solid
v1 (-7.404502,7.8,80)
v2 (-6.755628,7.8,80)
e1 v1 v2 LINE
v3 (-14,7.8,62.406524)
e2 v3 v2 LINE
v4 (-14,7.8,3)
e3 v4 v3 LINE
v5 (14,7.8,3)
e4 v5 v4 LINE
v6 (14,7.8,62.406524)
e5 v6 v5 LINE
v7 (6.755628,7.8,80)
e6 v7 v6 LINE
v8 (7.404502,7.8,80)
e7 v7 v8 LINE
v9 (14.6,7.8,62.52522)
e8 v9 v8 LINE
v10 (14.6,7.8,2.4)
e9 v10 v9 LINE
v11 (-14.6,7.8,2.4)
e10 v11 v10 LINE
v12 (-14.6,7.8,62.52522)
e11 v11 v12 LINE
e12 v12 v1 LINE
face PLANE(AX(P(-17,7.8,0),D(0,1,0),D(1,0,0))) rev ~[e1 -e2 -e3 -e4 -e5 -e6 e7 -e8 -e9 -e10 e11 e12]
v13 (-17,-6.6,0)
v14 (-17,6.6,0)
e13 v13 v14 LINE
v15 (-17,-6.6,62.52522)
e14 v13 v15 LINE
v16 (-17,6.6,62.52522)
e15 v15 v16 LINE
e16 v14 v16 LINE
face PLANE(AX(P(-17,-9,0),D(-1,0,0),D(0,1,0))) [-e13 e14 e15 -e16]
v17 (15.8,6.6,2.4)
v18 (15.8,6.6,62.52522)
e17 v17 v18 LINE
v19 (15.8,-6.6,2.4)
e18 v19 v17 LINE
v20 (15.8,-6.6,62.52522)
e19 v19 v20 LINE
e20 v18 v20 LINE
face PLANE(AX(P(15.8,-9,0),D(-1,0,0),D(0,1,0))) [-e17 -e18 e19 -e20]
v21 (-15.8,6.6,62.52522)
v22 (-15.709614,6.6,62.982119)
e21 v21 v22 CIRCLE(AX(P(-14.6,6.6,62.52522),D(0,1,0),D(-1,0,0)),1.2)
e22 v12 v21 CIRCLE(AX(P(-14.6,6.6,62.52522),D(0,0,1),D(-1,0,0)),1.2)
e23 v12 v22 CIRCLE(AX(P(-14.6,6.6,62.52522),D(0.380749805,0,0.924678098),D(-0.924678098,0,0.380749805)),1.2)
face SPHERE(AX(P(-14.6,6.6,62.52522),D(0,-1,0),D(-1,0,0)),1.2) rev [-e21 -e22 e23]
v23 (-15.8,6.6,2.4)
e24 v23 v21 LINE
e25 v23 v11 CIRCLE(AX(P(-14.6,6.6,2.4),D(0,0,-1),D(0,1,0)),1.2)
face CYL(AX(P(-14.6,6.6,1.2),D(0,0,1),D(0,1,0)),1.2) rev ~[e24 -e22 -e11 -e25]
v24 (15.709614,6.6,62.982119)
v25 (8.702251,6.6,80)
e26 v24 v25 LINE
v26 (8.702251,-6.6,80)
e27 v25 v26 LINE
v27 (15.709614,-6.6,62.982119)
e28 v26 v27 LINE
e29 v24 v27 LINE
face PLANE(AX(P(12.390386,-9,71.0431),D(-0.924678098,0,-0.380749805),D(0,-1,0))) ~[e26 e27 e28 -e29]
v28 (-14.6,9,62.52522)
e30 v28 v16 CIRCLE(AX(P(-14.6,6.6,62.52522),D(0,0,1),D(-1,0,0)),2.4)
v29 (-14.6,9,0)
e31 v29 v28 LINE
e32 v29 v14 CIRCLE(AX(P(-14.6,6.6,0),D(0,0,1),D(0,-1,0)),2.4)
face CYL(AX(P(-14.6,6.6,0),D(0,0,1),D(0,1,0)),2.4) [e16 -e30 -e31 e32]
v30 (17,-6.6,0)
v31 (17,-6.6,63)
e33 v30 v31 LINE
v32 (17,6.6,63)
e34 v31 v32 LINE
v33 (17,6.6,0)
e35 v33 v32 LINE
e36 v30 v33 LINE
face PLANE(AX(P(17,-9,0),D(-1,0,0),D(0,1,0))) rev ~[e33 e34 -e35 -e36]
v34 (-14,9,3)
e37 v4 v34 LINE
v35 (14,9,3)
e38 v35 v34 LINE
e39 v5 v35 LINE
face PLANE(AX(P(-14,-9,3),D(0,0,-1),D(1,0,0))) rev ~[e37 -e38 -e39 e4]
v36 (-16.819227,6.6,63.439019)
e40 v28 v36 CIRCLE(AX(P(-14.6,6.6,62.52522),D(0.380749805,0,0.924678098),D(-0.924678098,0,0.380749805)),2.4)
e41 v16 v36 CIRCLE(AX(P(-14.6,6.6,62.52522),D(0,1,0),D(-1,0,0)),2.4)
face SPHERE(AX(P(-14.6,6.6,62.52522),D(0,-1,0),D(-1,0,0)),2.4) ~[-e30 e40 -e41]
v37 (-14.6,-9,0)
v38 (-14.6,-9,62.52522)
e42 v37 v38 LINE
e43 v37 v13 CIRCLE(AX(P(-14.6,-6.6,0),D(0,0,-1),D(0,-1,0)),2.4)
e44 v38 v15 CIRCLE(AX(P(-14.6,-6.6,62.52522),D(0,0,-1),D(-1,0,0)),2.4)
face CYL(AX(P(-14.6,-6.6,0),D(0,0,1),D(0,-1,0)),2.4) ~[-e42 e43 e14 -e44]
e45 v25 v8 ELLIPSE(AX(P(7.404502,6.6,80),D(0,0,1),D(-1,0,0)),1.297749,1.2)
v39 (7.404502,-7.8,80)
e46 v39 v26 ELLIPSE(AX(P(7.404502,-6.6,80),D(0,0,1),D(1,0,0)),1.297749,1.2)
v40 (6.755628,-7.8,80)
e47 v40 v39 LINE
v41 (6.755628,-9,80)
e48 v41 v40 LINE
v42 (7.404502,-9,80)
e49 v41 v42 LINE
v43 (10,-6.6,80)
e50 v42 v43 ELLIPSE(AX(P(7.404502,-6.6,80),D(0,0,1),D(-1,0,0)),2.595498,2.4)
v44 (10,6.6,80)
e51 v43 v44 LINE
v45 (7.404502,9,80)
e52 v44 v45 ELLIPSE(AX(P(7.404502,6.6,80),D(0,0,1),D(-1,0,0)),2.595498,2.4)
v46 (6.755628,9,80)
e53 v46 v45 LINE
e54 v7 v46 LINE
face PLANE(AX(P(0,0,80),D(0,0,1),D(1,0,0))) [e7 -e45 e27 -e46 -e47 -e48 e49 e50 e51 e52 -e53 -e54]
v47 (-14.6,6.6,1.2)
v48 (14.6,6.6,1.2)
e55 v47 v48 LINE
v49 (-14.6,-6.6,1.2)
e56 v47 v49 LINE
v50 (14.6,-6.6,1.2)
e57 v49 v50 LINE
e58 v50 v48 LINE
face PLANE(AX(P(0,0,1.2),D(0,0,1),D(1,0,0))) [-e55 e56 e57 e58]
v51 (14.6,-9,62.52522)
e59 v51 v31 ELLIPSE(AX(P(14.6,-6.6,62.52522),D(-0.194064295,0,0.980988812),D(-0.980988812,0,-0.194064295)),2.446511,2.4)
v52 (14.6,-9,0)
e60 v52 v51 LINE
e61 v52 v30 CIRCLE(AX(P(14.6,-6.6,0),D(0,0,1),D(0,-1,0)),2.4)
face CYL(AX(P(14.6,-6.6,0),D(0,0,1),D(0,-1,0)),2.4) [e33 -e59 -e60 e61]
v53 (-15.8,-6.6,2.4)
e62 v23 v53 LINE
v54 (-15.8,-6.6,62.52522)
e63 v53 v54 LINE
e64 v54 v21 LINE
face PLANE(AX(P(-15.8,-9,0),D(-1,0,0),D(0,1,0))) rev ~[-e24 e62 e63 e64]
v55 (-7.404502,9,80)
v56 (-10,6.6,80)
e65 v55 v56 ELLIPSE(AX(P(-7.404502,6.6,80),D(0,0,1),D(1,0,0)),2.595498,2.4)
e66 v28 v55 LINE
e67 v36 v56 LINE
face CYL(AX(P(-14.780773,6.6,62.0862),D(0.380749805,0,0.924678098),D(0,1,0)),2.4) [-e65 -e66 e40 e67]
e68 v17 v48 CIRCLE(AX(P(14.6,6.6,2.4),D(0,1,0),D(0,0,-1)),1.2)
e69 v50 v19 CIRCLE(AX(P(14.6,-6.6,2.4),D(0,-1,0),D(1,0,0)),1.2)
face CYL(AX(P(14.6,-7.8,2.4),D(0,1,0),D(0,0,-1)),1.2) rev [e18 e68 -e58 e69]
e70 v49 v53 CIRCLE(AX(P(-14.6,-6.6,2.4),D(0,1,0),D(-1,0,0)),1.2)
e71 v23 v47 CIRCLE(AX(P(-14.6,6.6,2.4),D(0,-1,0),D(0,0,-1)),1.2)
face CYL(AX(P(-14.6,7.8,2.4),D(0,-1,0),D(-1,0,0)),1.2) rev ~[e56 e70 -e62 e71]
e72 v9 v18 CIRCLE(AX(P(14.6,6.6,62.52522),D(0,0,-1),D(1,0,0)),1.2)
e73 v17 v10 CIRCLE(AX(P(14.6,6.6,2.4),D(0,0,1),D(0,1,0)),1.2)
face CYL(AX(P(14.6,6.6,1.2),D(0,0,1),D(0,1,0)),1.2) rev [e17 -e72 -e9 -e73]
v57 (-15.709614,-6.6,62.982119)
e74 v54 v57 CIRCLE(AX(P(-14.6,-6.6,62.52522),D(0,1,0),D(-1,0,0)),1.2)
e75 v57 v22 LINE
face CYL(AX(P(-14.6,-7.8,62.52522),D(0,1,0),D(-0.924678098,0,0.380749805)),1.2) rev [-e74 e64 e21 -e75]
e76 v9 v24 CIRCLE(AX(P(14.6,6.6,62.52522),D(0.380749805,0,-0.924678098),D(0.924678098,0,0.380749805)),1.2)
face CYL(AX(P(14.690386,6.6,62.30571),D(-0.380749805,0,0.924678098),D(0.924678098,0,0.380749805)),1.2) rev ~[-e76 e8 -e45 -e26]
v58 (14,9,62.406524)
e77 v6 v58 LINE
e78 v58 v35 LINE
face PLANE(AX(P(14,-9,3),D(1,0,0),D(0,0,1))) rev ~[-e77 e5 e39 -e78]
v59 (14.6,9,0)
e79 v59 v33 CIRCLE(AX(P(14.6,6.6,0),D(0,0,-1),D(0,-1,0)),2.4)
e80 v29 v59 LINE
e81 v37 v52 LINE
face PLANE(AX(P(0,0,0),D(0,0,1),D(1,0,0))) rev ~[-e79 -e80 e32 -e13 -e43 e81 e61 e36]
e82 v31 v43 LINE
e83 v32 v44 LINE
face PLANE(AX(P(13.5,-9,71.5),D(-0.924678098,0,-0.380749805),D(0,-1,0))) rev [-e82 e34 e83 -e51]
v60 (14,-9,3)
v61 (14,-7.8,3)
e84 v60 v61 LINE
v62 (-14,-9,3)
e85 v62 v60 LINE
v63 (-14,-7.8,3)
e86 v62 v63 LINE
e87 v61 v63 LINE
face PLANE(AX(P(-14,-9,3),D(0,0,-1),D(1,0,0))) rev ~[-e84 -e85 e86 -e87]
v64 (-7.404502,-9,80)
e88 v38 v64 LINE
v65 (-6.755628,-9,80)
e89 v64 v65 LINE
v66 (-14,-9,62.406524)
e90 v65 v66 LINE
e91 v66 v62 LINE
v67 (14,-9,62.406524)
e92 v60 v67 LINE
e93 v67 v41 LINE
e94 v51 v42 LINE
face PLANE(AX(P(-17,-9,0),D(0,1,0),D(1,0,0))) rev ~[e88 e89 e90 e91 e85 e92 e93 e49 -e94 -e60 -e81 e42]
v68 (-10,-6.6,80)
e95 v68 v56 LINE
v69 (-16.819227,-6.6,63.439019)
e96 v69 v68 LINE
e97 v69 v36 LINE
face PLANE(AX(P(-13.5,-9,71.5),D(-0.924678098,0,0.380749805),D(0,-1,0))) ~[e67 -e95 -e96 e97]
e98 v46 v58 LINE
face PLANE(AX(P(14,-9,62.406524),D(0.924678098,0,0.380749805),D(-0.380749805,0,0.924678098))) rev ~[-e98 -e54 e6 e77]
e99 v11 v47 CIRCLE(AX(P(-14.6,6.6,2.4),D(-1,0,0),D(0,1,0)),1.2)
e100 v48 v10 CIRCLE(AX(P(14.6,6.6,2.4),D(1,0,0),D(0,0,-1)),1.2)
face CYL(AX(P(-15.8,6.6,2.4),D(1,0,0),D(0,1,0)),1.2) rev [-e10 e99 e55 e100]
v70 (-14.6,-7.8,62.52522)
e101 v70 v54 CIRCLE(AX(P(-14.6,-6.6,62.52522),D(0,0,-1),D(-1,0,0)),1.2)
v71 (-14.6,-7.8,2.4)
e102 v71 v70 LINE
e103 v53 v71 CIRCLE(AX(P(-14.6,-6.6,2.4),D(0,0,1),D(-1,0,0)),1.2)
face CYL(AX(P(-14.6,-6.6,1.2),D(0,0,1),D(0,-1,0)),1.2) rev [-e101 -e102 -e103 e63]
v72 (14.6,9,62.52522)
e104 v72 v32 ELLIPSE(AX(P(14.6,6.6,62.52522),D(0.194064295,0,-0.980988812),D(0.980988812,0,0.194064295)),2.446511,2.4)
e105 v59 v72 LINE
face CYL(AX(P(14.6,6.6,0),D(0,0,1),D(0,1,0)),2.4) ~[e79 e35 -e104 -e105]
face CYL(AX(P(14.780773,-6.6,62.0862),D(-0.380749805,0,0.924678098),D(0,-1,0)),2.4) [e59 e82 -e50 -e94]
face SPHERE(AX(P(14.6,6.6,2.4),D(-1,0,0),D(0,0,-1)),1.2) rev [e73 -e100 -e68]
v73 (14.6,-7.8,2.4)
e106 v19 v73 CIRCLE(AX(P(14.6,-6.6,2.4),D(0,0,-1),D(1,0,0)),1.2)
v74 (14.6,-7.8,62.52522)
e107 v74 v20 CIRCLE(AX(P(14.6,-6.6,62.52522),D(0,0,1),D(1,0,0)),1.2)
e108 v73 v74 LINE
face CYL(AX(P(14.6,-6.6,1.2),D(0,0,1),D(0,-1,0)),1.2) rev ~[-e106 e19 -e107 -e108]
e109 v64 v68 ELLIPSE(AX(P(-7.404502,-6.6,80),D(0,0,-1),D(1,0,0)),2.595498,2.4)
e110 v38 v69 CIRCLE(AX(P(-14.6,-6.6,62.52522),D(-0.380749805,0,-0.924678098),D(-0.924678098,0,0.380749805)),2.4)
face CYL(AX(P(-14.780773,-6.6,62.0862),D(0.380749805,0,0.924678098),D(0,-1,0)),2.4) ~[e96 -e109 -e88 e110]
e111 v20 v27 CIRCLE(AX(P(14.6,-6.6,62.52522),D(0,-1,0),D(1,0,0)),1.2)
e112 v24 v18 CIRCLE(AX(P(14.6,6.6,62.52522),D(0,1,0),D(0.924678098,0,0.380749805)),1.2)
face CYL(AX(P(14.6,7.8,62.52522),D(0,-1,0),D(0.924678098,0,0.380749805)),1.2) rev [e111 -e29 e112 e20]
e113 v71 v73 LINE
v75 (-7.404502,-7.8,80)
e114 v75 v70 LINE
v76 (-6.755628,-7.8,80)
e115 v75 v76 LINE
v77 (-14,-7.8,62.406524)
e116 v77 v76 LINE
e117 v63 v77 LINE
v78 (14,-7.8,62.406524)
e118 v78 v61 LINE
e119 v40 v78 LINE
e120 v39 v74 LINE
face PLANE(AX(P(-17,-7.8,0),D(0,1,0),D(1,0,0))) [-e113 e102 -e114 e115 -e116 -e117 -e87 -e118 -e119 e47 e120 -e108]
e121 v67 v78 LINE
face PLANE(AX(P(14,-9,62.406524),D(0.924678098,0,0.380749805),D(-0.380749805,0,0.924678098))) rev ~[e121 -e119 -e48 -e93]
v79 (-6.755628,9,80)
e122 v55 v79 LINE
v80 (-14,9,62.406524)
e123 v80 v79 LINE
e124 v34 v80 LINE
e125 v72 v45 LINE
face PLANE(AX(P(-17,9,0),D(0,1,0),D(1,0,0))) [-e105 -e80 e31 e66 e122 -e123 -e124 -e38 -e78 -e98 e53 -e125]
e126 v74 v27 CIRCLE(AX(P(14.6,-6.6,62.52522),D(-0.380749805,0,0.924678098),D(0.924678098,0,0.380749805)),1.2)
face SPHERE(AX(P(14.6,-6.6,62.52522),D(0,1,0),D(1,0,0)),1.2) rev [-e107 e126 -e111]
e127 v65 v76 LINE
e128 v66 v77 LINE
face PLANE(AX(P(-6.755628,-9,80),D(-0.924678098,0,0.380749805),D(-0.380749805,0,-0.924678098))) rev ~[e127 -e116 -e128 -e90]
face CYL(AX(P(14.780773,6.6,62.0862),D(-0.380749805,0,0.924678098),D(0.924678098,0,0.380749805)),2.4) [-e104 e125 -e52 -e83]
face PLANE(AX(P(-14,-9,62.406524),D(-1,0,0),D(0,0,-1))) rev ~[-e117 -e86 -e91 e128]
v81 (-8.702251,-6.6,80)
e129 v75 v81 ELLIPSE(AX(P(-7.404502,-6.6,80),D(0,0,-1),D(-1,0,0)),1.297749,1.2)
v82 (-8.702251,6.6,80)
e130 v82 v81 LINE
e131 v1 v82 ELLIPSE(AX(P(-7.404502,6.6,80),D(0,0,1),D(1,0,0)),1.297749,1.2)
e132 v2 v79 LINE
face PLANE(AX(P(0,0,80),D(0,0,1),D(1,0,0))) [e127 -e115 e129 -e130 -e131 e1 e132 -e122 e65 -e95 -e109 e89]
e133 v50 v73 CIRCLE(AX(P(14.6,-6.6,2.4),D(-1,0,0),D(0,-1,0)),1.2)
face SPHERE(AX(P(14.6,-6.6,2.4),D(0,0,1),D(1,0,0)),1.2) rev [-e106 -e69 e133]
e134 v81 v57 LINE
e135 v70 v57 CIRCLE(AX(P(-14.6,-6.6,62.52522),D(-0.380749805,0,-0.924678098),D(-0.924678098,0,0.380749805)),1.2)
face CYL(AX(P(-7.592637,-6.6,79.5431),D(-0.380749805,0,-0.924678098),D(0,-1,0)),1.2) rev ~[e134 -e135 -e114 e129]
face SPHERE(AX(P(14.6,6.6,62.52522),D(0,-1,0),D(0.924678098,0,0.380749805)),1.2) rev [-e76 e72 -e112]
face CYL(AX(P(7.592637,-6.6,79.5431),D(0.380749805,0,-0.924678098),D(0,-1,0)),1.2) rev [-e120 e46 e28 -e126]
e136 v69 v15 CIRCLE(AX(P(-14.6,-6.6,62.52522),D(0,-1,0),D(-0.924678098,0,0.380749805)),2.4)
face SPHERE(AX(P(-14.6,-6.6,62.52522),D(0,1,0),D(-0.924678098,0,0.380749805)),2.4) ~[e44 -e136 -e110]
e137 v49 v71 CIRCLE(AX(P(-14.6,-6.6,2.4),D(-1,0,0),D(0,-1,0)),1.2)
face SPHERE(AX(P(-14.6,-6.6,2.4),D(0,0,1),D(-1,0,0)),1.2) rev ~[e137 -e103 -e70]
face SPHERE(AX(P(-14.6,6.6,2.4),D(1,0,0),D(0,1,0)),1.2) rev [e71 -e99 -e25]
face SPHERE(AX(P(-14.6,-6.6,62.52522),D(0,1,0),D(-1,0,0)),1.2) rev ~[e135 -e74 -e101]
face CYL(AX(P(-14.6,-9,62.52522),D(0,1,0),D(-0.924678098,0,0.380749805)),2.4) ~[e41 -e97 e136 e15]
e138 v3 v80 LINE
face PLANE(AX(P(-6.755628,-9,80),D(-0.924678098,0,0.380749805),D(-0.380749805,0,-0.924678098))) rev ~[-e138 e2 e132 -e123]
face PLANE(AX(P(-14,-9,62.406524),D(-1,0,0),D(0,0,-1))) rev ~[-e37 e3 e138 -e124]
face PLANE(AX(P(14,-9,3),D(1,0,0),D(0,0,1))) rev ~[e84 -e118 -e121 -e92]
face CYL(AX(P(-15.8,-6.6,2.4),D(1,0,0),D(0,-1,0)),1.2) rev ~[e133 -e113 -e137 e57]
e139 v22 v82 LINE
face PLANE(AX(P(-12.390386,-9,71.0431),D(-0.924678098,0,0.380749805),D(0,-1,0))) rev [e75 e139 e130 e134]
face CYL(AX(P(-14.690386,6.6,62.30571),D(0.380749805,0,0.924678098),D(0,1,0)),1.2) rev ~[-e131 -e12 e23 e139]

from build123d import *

# Parameters (mm, degrees)
F0_W       = 34
F0_H       = 18
F1_DEPTH   = 80
F2_SIZE2   = 7
F2_SIZE    = 17
F2_2_SIZE2 = 7
F2_2_SIZE  = 17
F3_T       = -1.2
F5_DEPTH   = 18.001
F6_R       = 1.2
F7_R       = 2.4


with BuildPart() as f1:
    # F0 (on Top) → F1 (new body)
    with BuildSketch(Plane.XY):
        Rectangle(F0_W, F0_H)
    extrude(amount=F1_DEPTH)

    # F2
    f2_edges = [f1.edges().sort_by_distance(p)[0] for p in [
        (-17, 0, 80),
    ]]
    f2_side = f1.faces().sort_by_distance((-17, 0, 40))[0]
    chamfer(f2_edges, length=F2_SIZE, length2=F2_SIZE2, reference=f2_side)

    # F2#2
    f2_2_edges = [f1.edges().sort_by_distance(p)[0] for p in [
        (17, 0, 80),
    ]]
    f2_2_side = f1.faces().sort_by_distance((17, 0, 40))[0]
    chamfer(f2_2_edges, length=F2_2_SIZE, length2=F2_2_SIZE2, reference=f2_2_side)

    # F3
    f3_openings = [f1.faces().sort_by_distance(p)[0] for p in [
        (0, 0, 80),
    ]]
    offset(amount=F3_T, openings=f3_openings)

    # F4 (on face) → F5 (cut, through all)
    with BuildSketch(Plane.XZ.offset(9)):
        Polygon((-6.7556277098, 80), (-14, 62.4065244382), (-14, 3), (14, 3), (14, 62.4065244382), (6.7556277098, 80), align=None)
    extrude(amount=-F5_DEPTH, mode=Mode.SUBTRACT)

    # F6
    f6_edges = [f1.edges().sort_by_distance(p)[0] for p in [
        (0, 7.8, 1.2),
        (-15.8, 7.8, 31.981305),
        (-15.8, -7.8, 31.981305),
        (15.8, -7.8, 31.981305),
        (15.8, 0, 1.2),
        (15.8, 7.8, 31.981305),
        (-15.8, 0, 1.2),
        (0, -7.8, 1.2),
        (-12.251126, -7.8, 71.381305),
        (12.251126, -7.8, 71.381305),
        (15.8, 0, 62.76261),
        (12.251126, 7.8, 71.381305),
        (-12.251126, 7.8, 71.381305),
        (-15.8, 0, 62.76261),
    ]]
    fillet(f6_edges, radius=F6_R)

    # F7
    f7_edges = [f1.edges().sort_by_distance(p)[0] for p in [
        (-17, 9, 31.5),
        (17, 9, 31.5),
        (-17, -9, 31.5),
        (-13.5, 9, 71.5),
        (-17, 0, 63),
        (-13.5, -9, 71.5),
        (13.5, -9, 71.5),
        (17, -9, 31.5),
        (13.5, 9, 71.5),
    ]]
    fillet(f7_edges, radius=F7_R)


solid = f1.part
